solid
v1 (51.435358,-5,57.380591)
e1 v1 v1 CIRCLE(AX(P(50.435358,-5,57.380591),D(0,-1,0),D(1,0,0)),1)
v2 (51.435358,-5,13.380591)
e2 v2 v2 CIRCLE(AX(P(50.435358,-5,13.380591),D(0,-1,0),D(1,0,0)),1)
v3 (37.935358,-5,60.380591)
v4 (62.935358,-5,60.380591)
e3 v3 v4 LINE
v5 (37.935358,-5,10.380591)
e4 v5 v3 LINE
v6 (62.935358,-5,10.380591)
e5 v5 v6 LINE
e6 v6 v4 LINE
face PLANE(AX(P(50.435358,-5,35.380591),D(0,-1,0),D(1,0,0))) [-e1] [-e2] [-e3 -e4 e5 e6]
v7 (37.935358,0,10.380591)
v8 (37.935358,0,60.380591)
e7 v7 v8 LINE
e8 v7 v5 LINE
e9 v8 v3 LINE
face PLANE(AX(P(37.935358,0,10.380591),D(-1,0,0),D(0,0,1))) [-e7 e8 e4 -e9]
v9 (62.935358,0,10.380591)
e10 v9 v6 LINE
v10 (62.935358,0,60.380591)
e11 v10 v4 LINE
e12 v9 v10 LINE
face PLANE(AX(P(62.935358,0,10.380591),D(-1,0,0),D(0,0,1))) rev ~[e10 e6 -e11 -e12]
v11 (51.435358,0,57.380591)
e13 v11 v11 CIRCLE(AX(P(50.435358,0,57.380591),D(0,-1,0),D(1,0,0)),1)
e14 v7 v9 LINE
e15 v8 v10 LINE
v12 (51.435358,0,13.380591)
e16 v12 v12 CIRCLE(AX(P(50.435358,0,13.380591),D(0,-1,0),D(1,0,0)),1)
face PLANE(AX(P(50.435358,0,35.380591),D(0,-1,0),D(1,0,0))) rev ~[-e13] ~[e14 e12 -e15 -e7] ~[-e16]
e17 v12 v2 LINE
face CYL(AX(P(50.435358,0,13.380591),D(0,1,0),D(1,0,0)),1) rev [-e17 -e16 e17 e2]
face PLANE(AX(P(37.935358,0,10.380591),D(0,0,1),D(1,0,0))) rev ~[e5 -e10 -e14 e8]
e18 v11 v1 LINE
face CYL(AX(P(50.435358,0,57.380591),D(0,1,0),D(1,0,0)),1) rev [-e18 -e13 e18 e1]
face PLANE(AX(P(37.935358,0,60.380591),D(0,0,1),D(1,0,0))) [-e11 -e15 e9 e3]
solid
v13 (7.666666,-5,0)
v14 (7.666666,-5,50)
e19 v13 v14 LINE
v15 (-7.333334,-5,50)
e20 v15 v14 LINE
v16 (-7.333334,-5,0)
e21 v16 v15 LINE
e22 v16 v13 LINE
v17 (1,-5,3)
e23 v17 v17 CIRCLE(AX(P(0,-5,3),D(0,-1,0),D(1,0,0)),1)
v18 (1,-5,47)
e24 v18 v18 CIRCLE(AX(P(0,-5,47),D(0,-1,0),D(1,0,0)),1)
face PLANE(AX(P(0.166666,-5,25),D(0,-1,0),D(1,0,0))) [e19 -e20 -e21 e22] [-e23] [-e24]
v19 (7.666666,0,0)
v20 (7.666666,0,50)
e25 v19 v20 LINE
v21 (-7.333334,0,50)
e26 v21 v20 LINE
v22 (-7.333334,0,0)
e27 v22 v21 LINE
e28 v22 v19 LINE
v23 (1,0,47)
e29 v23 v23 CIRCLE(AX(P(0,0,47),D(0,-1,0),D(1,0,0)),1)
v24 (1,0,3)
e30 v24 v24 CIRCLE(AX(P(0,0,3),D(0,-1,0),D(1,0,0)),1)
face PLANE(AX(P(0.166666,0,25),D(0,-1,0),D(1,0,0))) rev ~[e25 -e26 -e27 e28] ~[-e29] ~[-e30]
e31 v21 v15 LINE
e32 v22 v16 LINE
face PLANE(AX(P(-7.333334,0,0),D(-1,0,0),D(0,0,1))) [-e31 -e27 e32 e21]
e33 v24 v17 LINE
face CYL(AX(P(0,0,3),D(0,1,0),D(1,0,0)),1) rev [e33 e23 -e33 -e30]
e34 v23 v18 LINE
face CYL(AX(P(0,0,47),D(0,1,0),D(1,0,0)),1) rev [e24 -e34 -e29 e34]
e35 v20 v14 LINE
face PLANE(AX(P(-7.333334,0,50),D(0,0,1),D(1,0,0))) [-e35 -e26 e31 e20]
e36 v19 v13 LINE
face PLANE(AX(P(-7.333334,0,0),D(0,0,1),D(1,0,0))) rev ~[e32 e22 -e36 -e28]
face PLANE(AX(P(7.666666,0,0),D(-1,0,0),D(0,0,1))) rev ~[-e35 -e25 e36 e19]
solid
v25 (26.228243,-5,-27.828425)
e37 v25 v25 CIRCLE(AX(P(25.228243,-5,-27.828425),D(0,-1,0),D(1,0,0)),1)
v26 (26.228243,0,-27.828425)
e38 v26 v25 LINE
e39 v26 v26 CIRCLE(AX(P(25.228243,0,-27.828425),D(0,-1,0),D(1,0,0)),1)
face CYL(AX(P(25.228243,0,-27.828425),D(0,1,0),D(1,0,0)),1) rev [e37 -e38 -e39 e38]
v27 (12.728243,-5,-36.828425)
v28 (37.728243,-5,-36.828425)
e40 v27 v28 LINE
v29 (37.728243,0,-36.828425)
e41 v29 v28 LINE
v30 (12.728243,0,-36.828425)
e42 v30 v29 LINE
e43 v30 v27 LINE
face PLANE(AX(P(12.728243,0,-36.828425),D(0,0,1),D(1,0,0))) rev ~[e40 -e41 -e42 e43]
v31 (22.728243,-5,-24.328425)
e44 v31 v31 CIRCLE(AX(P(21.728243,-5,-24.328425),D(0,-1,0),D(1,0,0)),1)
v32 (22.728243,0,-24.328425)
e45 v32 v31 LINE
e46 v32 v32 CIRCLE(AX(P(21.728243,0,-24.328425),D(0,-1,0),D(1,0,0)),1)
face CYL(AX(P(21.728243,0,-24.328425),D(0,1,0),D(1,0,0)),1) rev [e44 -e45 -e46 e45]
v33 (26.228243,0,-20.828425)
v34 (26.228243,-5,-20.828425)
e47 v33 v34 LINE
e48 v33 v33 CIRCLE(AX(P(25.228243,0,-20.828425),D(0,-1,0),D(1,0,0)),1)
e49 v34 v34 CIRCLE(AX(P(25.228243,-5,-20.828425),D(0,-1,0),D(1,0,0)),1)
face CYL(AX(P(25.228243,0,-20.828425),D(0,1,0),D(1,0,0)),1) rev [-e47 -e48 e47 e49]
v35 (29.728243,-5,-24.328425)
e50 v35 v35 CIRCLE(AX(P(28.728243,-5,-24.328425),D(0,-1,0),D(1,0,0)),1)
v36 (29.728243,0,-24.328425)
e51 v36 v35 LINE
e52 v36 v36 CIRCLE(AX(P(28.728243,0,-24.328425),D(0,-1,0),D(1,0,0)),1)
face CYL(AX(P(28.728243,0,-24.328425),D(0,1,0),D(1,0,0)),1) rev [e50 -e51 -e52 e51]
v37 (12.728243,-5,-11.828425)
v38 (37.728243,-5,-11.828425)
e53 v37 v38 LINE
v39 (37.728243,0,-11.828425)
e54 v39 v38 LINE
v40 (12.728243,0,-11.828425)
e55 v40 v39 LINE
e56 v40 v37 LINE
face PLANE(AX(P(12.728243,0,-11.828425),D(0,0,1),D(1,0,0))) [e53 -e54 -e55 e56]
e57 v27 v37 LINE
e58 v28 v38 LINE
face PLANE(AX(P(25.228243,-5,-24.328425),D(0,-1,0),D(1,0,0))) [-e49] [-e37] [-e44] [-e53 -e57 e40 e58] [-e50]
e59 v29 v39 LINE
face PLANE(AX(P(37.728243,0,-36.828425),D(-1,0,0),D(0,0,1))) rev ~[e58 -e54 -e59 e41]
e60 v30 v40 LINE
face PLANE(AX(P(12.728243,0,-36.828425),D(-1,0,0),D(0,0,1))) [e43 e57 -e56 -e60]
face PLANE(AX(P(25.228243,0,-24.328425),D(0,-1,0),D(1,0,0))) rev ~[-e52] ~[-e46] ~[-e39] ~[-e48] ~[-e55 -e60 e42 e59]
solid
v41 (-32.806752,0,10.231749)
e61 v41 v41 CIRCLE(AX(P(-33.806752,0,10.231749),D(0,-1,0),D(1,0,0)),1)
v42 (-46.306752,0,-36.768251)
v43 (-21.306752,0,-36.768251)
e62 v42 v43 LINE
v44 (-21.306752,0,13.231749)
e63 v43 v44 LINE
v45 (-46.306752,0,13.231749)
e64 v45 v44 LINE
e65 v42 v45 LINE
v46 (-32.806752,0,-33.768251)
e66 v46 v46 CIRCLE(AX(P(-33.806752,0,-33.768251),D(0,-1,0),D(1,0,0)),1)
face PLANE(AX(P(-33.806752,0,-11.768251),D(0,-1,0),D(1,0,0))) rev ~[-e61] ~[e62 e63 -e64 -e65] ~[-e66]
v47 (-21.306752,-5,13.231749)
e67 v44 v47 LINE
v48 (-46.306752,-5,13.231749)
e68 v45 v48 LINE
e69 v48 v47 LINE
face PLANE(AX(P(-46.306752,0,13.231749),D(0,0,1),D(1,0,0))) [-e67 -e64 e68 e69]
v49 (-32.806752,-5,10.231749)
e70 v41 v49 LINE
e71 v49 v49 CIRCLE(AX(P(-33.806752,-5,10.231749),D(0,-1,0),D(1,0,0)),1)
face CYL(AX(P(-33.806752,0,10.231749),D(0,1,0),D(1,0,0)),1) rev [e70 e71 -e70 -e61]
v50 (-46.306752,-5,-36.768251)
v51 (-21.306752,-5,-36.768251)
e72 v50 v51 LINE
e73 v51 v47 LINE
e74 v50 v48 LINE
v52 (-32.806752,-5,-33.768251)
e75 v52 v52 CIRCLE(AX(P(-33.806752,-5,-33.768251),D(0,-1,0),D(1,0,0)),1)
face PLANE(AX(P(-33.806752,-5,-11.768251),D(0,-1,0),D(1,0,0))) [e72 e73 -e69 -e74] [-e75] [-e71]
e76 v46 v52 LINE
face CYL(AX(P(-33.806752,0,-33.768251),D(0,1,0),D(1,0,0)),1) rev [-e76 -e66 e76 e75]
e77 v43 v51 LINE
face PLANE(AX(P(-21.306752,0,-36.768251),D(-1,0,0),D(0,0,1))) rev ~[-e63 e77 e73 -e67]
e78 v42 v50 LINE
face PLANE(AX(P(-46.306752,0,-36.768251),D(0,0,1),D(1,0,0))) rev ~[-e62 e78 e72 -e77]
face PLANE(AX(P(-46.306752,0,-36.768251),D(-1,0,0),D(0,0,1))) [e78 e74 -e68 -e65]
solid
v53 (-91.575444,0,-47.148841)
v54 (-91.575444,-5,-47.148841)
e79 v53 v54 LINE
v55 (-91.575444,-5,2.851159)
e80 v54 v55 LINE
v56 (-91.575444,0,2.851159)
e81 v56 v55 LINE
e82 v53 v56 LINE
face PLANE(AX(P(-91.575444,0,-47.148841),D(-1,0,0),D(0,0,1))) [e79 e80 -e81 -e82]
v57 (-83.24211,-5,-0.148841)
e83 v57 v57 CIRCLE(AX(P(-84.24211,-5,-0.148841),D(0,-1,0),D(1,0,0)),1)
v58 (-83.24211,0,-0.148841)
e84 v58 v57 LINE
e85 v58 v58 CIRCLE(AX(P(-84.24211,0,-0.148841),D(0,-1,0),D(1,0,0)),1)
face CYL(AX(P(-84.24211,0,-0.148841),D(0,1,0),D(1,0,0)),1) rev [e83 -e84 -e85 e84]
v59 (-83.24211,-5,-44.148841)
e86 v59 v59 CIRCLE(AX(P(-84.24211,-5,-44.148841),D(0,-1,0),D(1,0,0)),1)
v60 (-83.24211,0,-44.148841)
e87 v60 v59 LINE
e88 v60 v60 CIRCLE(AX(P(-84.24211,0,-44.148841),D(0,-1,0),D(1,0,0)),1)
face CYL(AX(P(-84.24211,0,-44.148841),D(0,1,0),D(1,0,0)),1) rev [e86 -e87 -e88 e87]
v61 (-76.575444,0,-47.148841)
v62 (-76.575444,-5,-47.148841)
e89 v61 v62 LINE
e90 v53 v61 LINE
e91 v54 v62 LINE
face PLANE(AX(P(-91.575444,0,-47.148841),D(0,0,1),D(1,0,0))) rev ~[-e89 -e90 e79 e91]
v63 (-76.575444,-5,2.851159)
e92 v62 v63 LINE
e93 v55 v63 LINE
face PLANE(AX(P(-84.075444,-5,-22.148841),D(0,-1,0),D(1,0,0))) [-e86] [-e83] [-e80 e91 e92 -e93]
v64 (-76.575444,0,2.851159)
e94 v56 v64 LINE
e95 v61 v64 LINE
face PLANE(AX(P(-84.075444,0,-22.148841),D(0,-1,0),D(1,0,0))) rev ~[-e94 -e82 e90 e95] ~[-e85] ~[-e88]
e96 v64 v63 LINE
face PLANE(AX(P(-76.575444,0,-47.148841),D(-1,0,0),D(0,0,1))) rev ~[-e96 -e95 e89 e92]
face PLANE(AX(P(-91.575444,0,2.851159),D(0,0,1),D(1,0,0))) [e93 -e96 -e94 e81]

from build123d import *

# Parameters (mm, degrees)
F0_W     = 15
F0_H     = 50
F0_R     = 1
F1_DEPTH = 5
F2_DEPTH = 5
F0_W_2   = 25
F0_H_2   = 25


# Not quite as in the source:
# - a feature names something its author has since deleted; it is built from what else it names


with BuildPart() as f1:
    # F0 (on Front) → F1 (new body)
    with BuildSketch(Plane.XZ):
        with Locations((0.1666661408, 25)):
            Rectangle(F0_W, F0_H)
        with Locations((0, 3)):
            Circle(F0_R, mode=Mode.SUBTRACT)
        with Locations((0, 47)):
            Circle(F0_R, mode=Mode.SUBTRACT)
    extrude(amount=F1_DEPTH)

    # F0 (on Front) → F2 (join)
    with BuildSketch(Plane.XZ):
        with Locations((0.1666661408, 25)):
            Rectangle(F0_W, F0_H)
        with Locations((0, 3)):
            Circle(F0_R, mode=Mode.SUBTRACT)
        with Locations((0, 47)):
            Circle(F0_R, mode=Mode.SUBTRACT)
    extrude(amount=F2_DEPTH)


with BuildPart() as f2:
    # F0 (on Front) → F2, piece 2 (new body)
    with BuildSketch(Plane.XZ):
        with Locations((50.4353579649, 35.3805905879)):
            Rectangle(F0_W_2, F0_H)
        with Locations((50.4353579649, 13.3805905879)):
            Circle(F0_R, mode=Mode.SUBTRACT)
        with Locations((50.4353579649, 57.3805905879)):
            Circle(F0_R, mode=Mode.SUBTRACT)
    extrude(amount=F2_DEPTH)


with BuildPart() as f2b:
    # F0 (on Front) → F2, piece 3 (new body)
    with BuildSketch(Plane.XZ):
        with Locations((-84.0754437791, -22.1488411874)):
            Rectangle(F0_W, F0_H)
        with Locations((-84.2421099199, -44.1488411874)):
            Circle(F0_R, mode=Mode.SUBTRACT)
        with Locations((-84.2421099199, -0.1488411874)):
            Circle(F0_R, mode=Mode.SUBTRACT)
    extrude(amount=F2_DEPTH)


with BuildPart() as f2c:
    # F0 (on Front) → F2, piece 4 (new body)
    with BuildSketch(Plane.XZ):
        with Locations((-33.806751955, -11.7682505995)):
            Rectangle(F0_W_2, F0_H)
        with Locations((-33.806751955, -33.7682505995)):
            Circle(F0_R, mode=Mode.SUBTRACT)
        with Locations((-33.806751955, 10.2317494005)):
            Circle(F0_R, mode=Mode.SUBTRACT)
    extrude(amount=F2_DEPTH)


with BuildPart() as f2d:
    # F0 (on Front) → F2, piece 5 (new body)
    with BuildSketch(Plane.XZ):
        with Locations((25.2282431349, -24.3284247816)):
            Rectangle(F0_W_2, F0_H_2)
        with Locations((21.7282431349, -24.3284247816)):
            Circle(F0_R, mode=Mode.SUBTRACT)
        with Locations((25.2282431349, -27.8284247816)):
            Circle(F0_R, mode=Mode.SUBTRACT)
        with Locations((28.7282431349, -24.3284247816)):
            Circle(F0_R, mode=Mode.SUBTRACT)
        with Locations((25.2282431349, -20.8284247816)):
            Circle(F0_R, mode=Mode.SUBTRACT)
    extrude(amount=F2_DEPTH)


solid = Compound([f1.part, f2.part, f2b.part, f2c.part, f2d.part])
